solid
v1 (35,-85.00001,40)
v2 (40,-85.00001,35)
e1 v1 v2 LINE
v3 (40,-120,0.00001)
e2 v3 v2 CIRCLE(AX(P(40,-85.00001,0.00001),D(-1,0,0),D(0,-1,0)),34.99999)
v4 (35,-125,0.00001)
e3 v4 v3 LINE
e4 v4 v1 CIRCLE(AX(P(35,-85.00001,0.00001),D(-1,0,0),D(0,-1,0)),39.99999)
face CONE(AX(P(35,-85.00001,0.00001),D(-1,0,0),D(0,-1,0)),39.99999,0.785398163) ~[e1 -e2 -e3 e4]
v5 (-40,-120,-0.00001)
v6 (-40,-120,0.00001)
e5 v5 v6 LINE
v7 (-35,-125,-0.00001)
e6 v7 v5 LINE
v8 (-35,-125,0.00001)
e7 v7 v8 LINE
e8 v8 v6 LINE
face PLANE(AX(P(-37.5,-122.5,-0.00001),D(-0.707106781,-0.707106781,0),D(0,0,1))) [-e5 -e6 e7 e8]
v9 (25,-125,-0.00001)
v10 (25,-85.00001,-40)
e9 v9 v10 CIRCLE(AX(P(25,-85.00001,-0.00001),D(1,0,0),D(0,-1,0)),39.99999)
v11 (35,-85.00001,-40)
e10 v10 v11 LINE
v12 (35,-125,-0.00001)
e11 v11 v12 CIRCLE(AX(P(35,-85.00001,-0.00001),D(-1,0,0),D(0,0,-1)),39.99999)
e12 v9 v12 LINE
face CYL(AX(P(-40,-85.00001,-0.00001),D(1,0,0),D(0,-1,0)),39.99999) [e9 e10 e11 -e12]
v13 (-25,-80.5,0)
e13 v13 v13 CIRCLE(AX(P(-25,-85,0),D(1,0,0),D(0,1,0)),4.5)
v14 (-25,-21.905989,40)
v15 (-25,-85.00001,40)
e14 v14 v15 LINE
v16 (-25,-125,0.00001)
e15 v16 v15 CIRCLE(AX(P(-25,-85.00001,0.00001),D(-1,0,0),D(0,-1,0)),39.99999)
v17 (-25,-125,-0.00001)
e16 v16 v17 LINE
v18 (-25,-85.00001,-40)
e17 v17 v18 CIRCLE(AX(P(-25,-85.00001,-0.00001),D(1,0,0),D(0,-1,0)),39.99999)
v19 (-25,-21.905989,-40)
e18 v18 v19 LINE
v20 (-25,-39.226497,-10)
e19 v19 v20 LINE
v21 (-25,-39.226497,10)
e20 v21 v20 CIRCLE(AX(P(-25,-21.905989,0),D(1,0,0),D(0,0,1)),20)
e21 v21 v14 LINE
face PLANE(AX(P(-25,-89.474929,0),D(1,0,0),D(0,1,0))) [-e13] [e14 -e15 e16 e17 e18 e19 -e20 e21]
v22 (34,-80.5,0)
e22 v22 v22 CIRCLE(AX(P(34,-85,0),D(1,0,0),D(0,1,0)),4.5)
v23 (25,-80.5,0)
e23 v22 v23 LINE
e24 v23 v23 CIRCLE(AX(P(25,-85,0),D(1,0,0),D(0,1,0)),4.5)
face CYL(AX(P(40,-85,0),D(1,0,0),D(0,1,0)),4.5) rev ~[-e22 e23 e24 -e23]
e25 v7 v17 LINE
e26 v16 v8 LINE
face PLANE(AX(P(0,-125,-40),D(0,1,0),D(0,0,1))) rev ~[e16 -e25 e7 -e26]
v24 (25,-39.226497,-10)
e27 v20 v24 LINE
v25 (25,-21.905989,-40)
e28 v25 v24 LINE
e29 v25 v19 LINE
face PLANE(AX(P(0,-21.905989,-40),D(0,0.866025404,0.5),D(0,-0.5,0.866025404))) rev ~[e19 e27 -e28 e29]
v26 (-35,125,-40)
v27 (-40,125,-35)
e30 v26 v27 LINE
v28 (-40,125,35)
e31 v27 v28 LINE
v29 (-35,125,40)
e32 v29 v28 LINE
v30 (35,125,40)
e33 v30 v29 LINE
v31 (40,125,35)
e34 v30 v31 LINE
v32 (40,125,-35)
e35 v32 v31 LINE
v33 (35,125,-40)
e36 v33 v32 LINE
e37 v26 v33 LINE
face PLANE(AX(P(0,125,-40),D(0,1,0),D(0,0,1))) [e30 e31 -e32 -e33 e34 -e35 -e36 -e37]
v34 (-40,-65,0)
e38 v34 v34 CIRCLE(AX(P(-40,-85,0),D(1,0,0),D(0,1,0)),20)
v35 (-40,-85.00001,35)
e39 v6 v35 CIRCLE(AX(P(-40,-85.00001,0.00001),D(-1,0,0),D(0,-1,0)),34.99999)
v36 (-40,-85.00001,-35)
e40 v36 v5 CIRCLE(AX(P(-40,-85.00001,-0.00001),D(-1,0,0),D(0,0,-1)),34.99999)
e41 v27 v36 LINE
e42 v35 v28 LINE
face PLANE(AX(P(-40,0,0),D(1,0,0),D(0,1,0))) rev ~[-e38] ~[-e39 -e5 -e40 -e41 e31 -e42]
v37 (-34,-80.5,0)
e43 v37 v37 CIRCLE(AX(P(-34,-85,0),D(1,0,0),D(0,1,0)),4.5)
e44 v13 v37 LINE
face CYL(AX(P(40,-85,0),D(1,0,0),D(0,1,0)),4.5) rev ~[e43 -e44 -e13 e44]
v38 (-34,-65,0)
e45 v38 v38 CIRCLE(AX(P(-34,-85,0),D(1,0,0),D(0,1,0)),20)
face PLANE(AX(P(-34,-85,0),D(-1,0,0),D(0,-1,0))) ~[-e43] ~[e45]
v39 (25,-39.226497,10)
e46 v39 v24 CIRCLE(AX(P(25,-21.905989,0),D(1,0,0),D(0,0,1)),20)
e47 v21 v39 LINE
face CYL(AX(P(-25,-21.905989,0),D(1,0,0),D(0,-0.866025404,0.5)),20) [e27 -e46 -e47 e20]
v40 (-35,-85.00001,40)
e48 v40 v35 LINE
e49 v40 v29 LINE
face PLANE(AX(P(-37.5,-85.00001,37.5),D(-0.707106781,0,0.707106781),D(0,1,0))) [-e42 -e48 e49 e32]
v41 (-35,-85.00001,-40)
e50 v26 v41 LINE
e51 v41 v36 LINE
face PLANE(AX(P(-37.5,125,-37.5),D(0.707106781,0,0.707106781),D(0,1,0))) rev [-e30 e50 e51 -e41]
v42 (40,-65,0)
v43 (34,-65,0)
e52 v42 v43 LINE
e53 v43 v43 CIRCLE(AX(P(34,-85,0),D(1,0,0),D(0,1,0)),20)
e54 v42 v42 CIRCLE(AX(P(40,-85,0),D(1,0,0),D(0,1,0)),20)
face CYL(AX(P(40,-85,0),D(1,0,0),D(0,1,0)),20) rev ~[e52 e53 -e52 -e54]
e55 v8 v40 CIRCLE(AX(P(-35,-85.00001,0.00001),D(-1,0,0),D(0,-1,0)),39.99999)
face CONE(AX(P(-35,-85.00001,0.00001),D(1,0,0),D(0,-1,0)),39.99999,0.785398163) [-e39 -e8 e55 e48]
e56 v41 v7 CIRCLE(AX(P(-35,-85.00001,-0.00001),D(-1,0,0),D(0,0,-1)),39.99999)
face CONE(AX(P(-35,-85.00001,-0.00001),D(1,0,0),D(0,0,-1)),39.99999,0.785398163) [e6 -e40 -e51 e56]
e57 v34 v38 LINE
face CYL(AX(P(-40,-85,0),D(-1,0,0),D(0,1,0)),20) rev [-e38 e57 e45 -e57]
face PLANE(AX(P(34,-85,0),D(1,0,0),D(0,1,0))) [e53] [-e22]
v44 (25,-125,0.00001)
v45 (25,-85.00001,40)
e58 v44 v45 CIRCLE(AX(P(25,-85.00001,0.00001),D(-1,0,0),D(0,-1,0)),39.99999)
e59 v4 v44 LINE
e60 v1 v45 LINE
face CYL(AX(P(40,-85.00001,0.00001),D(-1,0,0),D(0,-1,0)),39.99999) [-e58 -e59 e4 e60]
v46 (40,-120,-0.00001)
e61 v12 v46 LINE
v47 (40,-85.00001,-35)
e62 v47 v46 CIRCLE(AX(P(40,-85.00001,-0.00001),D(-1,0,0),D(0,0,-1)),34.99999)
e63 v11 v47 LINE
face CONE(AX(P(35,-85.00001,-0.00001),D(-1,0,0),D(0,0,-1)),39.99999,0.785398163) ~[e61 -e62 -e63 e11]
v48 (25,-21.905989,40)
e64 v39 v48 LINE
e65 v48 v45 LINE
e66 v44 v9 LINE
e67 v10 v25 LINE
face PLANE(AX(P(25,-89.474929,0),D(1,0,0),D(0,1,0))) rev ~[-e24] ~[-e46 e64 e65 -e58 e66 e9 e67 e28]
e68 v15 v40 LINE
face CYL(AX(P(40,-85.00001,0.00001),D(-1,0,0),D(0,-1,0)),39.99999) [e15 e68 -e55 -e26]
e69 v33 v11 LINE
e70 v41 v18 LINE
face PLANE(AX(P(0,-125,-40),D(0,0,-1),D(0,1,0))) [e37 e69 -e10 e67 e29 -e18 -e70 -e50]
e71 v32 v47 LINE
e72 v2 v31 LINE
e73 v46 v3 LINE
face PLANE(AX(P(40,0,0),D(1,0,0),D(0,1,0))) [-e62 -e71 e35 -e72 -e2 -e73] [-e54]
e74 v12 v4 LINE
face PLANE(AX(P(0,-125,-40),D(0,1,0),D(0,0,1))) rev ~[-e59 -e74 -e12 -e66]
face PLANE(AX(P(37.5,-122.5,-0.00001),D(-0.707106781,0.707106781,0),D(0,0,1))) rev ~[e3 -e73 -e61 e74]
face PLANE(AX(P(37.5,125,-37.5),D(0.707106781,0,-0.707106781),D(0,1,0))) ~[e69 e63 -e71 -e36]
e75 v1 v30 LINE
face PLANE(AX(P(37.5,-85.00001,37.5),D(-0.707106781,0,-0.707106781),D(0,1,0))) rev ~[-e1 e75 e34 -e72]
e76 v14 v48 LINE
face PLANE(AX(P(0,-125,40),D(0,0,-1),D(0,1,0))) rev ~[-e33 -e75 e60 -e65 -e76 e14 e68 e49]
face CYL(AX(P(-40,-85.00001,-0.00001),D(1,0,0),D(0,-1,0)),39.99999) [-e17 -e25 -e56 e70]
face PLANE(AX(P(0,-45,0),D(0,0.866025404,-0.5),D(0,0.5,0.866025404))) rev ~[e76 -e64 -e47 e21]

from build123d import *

# Parameters (mm, degrees)
F0_W      = 250
F0_H      = 80
F1_DEPTH  = 40
F2_R      = 39.99999
F4_DEPTH  = 25
F5_R      = 20
F6_SIZE   = 5
F7_R      = 4.5
F8_DEPTH  = 80.001
F9_R      = 20
F10_DEPTH = 6


# Not quite as in the source:
# - a fillet or chamfer is up to 0.001 mm smaller than in the source, because OpenCascade refuses the exact size
# - a pattern or mirror of a feature is missing from the dataset's text; its kind, count and spacing are read off the source's solid


with BuildPart() as f1:
    # F0 (on Right) → F1 (new body, symmetric)
    with BuildSketch(Plane.YZ):
        Rectangle(F0_W, F0_H)
    extrude(amount=F1_DEPTH, both=True)

    # F2 (radius 40 in the source; OpenCascade refuses exactly that, so slightly less here)
    f2_edges = [f1.edges().sort_by_distance(p)[0] for p in [
        (0, -125, 40),
        (0, -125, -40),
    ]]
    fillet(f2_edges, radius=F2_R)

    # F3 (on Right) → F4 (cut, symmetric)
    with BuildSketch(Plane.YZ):
        Polygon((-21.9059892324, -40), (-45, 0), (-21.9059892324, 40), (-155.967399478, 40), (-155.967399478, -40), align=None)
    extrude(amount=F4_DEPTH, both=True, mode=Mode.SUBTRACT)

    # F5
    f5_edges = [f1.edges().sort_by_distance(p)[0] for p in [
        (0, -45, 0),
    ]]
    fillet(f5_edges, radius=F5_R)

    # F6
    f6_edges = [f1.edges().sort_by_distance(p)[0] for p in [
        (40, 19.999995, 40),
        (-40, 19.999995, 40),
        (40, -113.284274, 28.284274),
        (40, 19.999995, -40),
        (-40, 19.999995, -40),
        (40, -125, 0),
        (40, -113.284274, -28.284274),
        (-40, -113.284274, 28.284274),
        (-40, -125, 0),
        (-40, -113.284274, -28.284274),
    ]]
    chamfer(f6_edges, length=F6_SIZE)

    # F7 (on face) → F8 (cut, through all)
    with BuildSketch(Plane.YZ.offset(40)):
        with Locations((-85, 0)):
            Circle(F7_R)
    extrude(amount=-F8_DEPTH, mode=Mode.SUBTRACT)

    # F9 (on face) → F10 (cut)
    with BuildSketch(Plane.YZ.offset(40)):
        with Locations((-85, 0)):
            Circle(F9_R)
    f10 = extrude(amount=-F10_DEPTH, mode=Mode.SUBTRACT)

    # F10_copies: F10 across plane
    add(f10.mirror(Plane(origin=(0, 0, 0), x_dir=(0, 0, -1), z_dir=(-1, 0, 0))), mode=Mode.SUBTRACT)


solid = f1.part
